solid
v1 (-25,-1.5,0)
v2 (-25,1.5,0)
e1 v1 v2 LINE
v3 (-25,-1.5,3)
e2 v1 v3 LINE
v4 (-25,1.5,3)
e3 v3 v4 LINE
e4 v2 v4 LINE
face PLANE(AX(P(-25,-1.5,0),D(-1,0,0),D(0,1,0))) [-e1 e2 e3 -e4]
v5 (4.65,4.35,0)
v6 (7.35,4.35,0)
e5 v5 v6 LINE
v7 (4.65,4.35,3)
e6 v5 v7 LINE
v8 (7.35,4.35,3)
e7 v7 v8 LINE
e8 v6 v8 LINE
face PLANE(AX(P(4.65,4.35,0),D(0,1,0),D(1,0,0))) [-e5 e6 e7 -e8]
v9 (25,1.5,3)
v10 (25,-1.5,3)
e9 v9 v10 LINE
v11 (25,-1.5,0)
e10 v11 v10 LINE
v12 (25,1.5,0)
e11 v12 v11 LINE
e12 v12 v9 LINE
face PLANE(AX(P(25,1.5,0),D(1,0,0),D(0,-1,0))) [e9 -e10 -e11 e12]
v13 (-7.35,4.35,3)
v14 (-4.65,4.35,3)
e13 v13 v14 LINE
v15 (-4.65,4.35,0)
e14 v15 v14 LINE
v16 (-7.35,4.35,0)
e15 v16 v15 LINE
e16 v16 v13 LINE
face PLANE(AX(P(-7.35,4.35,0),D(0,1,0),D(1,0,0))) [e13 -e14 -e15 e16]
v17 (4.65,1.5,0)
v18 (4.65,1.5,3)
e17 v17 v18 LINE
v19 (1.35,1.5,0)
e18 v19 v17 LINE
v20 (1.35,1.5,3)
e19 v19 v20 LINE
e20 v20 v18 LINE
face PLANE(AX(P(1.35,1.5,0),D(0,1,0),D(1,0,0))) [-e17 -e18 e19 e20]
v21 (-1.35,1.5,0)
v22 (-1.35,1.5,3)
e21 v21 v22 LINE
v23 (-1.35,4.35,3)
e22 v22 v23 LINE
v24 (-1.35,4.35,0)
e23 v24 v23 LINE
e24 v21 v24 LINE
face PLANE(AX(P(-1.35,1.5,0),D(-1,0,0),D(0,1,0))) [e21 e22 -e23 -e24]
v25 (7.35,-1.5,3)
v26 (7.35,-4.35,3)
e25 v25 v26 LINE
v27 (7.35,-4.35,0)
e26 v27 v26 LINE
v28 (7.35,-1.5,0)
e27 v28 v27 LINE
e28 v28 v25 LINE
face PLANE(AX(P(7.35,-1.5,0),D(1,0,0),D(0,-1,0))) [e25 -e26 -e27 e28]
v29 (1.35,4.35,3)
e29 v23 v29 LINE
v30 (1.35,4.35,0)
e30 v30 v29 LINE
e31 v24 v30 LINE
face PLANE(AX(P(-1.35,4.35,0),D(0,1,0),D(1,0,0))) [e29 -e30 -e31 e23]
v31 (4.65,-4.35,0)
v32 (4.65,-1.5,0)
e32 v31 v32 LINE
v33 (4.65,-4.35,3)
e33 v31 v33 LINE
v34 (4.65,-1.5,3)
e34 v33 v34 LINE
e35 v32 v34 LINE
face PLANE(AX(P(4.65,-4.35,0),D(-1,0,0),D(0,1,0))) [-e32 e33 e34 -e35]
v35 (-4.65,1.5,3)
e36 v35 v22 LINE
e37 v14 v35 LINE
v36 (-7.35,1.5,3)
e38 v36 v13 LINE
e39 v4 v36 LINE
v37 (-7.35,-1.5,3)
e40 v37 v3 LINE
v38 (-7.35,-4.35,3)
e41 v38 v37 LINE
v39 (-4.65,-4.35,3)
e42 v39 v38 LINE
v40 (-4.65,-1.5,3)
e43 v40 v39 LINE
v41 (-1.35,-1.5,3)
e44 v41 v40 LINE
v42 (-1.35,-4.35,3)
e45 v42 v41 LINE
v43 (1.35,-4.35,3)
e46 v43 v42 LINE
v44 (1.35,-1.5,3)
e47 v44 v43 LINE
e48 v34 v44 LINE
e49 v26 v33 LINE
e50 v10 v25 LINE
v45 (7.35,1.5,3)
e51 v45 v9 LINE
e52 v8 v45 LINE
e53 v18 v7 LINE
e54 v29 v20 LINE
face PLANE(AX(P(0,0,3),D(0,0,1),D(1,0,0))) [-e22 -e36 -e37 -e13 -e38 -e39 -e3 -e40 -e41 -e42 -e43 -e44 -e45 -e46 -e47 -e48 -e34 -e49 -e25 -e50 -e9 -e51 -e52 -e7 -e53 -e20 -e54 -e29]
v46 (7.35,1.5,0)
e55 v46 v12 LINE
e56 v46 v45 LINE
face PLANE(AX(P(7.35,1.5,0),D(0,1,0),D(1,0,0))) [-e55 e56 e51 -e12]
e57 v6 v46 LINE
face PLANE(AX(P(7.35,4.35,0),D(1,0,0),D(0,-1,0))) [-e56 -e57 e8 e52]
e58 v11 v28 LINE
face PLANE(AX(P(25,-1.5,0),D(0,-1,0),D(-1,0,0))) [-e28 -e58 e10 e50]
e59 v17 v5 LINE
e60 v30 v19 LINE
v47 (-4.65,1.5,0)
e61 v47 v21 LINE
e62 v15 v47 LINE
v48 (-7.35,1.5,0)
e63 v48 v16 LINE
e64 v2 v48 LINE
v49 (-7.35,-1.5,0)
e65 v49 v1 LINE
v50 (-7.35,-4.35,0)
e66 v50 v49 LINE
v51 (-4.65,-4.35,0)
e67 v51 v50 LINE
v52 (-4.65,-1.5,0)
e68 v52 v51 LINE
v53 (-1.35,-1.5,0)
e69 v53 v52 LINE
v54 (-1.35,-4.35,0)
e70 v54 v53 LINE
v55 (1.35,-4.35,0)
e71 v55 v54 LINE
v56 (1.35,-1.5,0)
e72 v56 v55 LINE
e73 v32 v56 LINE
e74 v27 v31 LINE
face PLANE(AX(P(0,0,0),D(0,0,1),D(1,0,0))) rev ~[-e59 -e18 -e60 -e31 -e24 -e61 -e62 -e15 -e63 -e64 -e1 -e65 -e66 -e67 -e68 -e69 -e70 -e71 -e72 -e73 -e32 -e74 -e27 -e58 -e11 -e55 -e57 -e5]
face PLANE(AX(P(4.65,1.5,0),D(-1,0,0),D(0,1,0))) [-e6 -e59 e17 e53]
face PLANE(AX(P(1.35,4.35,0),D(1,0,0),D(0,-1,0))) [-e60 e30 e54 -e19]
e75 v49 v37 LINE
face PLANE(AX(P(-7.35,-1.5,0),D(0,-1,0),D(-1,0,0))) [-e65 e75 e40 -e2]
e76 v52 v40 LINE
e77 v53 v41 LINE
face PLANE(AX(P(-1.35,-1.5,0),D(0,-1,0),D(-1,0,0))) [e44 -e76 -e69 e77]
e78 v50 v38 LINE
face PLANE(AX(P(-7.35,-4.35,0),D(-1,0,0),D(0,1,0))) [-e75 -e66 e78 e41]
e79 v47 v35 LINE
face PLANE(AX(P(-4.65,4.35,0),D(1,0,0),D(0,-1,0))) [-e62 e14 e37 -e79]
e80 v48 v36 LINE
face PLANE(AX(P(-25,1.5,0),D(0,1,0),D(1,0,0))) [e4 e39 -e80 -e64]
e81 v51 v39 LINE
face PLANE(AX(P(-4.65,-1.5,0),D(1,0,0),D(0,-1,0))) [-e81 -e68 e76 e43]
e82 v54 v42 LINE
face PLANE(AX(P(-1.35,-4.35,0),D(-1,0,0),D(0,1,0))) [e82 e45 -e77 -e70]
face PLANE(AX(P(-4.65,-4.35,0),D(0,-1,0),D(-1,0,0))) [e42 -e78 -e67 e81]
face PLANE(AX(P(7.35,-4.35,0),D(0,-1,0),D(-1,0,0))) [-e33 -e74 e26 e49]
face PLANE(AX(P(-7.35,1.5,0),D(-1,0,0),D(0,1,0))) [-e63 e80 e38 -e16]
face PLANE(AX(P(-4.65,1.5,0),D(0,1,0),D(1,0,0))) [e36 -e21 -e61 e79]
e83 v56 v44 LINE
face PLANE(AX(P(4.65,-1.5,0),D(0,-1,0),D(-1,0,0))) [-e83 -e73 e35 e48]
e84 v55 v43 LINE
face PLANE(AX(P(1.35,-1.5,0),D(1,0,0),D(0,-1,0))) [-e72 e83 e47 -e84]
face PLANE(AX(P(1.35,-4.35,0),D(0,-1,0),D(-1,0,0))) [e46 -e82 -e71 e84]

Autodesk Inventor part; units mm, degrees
ref_plane "YZ Plane" through (0, 0, 0) normal (1, 0, 0) x (0, 1, 0)
ref_plane "XZ Plane" through (0, 0, 0) normal (0, 1, 0) x (-1, 0, 0)
ref_plane "XY Plane" through (0, 0, 0) normal (0, 0, 1) x (1, 0, 0)
sketch "tabs" plane through (0, 0, 0) normal (0, 0, 1) x (1, 0, 0)
  line L0 (16.0425, 13.6368) -> (18.7425, 13.6368)
  line L1 (18.7425, 13.6368) -> (18.7425, 10.7868)
  line L2 (18.7425, 10.7868) -> (16.0425, 10.7868)
  line L3 (16.0425, 10.7868) -> (16.0425, 13.6368)
  line L4 (22.0425, 13.6368) -> (24.7425, 13.6368)
  line L5 (24.7425, 13.6368) -> (24.7425, 10.7868)
  line L6 (24.7425, 10.7868) -> (22.0425, 10.7868)
  line L7 (22.0425, 10.7868) -> (22.0425, 13.6368)
  line L8 (28.0425, 13.6368) -> (30.7425, 13.6368)
  line L9 (30.7425, 13.6368) -> (30.7425, 10.7868)
  line L10 (30.7425, 10.7868) -> (28.0425, 10.7868)
  line L11 (28.0425, 10.7868) -> (28.0425, 13.6368)
  line L12 (23.3925, 10.7868) -> (23.3925, 8.8536) construction
  point P0 (23.3925, 12.1901)
  dimension "d2" = 2.7
  dimension "d3" = 3.3
  dimension "d4" = 3.3
  dimension "d5" = 2.85
sketch "Sketch1" plane through (0, 0, 0) normal (0, 0, 1) x (1, 0, 0)
  line L0 (-25, 1.5) -> (25, 1.5)
  line L1 (25, 1.5) -> (25, -1.5)
  line L2 (25, -1.5) -> (-25, -1.5)
  line L3 (-25, -1.5) -> (-25, 1.5)
  line L4 (0, 16.9043) -> (0, -20.0235) construction
  line L5 (-32.3473, 0) -> (40.4078, 0) construction
  line L6 (-7.35, 4.35) -> (-4.65, 4.35)
  line L7 (-4.65, 4.35) -> (-4.65, 1.5)
  line L8 (-4.65, 1.5) -> (-7.35, 1.5)
  line L9 (-7.35, 1.5) -> (-7.35, 4.35)
  line L10 (-1.35, 4.35) -> (1.35, 4.35)
  line L11 (1.35, 4.35) -> (1.35, 1.5)
  line L12 (1.35, 1.5) -> (-1.35, 1.5)
  line L13 (-1.35, 1.5) -> (-1.35, 4.35)
  line L14 (4.65, 4.35) -> (7.35, 4.35)
  line L15 (7.35, 4.35) -> (7.35, 1.5)
  line L16 (7.35, 1.5) -> (4.65, 1.5)
  line L17 (4.65, 1.5) -> (4.65, 4.35)
  line L18 (0, 1.5) -> (0, -0.4332) construction
  line L19 (-7.35, -1.5) -> (-4.65, -1.5)
  line L20 (-4.65, -1.5) -> (-4.65, -4.35)
  line L21 (-4.65, -4.35) -> (-7.35, -4.35)
  line L22 (-7.35, -4.35) -> (-7.35, -1.5)
  line L23 (-1.35, -1.5) -> (1.35, -1.5)
  line L24 (1.35, -1.5) -> (1.35, -4.35)
  line L25 (1.35, -4.35) -> (-1.35, -4.35)
  line L26 (-1.35, -4.35) -> (-1.35, -1.5)
  line L27 (4.65, -1.5) -> (7.35, -1.5)
  line L28 (7.35, -1.5) -> (7.35, -4.35)
  line L29 (7.35, -4.35) -> (4.65, -4.35)
  line L30 (4.65, -4.35) -> (4.65, -1.5)
  line L31 (0, -4.35) -> (0, -6.2832) construction
  point P0 (0, 0)
  point P1 (0, 1.5)
  point P2 (25, 0)
  dimension "d0" = 50
  dimension "d1" = 3
extrude "Extrusion1" add sketch "Sketch1" along normal blind 3
equation "\"d2\" = mat + kerf"
equation "\"d3\" = mat - kerf"
equation "\"d4\" = mat - kerf"
equation "\"d5\" = mat + 0.5 * kerf"
equation "\"d1\" = mat"
equation "\"d6\" = mat"
equation "\"mat\" = 3"
equation "\"kerf\" = -0.3"
properties part number "link1"
